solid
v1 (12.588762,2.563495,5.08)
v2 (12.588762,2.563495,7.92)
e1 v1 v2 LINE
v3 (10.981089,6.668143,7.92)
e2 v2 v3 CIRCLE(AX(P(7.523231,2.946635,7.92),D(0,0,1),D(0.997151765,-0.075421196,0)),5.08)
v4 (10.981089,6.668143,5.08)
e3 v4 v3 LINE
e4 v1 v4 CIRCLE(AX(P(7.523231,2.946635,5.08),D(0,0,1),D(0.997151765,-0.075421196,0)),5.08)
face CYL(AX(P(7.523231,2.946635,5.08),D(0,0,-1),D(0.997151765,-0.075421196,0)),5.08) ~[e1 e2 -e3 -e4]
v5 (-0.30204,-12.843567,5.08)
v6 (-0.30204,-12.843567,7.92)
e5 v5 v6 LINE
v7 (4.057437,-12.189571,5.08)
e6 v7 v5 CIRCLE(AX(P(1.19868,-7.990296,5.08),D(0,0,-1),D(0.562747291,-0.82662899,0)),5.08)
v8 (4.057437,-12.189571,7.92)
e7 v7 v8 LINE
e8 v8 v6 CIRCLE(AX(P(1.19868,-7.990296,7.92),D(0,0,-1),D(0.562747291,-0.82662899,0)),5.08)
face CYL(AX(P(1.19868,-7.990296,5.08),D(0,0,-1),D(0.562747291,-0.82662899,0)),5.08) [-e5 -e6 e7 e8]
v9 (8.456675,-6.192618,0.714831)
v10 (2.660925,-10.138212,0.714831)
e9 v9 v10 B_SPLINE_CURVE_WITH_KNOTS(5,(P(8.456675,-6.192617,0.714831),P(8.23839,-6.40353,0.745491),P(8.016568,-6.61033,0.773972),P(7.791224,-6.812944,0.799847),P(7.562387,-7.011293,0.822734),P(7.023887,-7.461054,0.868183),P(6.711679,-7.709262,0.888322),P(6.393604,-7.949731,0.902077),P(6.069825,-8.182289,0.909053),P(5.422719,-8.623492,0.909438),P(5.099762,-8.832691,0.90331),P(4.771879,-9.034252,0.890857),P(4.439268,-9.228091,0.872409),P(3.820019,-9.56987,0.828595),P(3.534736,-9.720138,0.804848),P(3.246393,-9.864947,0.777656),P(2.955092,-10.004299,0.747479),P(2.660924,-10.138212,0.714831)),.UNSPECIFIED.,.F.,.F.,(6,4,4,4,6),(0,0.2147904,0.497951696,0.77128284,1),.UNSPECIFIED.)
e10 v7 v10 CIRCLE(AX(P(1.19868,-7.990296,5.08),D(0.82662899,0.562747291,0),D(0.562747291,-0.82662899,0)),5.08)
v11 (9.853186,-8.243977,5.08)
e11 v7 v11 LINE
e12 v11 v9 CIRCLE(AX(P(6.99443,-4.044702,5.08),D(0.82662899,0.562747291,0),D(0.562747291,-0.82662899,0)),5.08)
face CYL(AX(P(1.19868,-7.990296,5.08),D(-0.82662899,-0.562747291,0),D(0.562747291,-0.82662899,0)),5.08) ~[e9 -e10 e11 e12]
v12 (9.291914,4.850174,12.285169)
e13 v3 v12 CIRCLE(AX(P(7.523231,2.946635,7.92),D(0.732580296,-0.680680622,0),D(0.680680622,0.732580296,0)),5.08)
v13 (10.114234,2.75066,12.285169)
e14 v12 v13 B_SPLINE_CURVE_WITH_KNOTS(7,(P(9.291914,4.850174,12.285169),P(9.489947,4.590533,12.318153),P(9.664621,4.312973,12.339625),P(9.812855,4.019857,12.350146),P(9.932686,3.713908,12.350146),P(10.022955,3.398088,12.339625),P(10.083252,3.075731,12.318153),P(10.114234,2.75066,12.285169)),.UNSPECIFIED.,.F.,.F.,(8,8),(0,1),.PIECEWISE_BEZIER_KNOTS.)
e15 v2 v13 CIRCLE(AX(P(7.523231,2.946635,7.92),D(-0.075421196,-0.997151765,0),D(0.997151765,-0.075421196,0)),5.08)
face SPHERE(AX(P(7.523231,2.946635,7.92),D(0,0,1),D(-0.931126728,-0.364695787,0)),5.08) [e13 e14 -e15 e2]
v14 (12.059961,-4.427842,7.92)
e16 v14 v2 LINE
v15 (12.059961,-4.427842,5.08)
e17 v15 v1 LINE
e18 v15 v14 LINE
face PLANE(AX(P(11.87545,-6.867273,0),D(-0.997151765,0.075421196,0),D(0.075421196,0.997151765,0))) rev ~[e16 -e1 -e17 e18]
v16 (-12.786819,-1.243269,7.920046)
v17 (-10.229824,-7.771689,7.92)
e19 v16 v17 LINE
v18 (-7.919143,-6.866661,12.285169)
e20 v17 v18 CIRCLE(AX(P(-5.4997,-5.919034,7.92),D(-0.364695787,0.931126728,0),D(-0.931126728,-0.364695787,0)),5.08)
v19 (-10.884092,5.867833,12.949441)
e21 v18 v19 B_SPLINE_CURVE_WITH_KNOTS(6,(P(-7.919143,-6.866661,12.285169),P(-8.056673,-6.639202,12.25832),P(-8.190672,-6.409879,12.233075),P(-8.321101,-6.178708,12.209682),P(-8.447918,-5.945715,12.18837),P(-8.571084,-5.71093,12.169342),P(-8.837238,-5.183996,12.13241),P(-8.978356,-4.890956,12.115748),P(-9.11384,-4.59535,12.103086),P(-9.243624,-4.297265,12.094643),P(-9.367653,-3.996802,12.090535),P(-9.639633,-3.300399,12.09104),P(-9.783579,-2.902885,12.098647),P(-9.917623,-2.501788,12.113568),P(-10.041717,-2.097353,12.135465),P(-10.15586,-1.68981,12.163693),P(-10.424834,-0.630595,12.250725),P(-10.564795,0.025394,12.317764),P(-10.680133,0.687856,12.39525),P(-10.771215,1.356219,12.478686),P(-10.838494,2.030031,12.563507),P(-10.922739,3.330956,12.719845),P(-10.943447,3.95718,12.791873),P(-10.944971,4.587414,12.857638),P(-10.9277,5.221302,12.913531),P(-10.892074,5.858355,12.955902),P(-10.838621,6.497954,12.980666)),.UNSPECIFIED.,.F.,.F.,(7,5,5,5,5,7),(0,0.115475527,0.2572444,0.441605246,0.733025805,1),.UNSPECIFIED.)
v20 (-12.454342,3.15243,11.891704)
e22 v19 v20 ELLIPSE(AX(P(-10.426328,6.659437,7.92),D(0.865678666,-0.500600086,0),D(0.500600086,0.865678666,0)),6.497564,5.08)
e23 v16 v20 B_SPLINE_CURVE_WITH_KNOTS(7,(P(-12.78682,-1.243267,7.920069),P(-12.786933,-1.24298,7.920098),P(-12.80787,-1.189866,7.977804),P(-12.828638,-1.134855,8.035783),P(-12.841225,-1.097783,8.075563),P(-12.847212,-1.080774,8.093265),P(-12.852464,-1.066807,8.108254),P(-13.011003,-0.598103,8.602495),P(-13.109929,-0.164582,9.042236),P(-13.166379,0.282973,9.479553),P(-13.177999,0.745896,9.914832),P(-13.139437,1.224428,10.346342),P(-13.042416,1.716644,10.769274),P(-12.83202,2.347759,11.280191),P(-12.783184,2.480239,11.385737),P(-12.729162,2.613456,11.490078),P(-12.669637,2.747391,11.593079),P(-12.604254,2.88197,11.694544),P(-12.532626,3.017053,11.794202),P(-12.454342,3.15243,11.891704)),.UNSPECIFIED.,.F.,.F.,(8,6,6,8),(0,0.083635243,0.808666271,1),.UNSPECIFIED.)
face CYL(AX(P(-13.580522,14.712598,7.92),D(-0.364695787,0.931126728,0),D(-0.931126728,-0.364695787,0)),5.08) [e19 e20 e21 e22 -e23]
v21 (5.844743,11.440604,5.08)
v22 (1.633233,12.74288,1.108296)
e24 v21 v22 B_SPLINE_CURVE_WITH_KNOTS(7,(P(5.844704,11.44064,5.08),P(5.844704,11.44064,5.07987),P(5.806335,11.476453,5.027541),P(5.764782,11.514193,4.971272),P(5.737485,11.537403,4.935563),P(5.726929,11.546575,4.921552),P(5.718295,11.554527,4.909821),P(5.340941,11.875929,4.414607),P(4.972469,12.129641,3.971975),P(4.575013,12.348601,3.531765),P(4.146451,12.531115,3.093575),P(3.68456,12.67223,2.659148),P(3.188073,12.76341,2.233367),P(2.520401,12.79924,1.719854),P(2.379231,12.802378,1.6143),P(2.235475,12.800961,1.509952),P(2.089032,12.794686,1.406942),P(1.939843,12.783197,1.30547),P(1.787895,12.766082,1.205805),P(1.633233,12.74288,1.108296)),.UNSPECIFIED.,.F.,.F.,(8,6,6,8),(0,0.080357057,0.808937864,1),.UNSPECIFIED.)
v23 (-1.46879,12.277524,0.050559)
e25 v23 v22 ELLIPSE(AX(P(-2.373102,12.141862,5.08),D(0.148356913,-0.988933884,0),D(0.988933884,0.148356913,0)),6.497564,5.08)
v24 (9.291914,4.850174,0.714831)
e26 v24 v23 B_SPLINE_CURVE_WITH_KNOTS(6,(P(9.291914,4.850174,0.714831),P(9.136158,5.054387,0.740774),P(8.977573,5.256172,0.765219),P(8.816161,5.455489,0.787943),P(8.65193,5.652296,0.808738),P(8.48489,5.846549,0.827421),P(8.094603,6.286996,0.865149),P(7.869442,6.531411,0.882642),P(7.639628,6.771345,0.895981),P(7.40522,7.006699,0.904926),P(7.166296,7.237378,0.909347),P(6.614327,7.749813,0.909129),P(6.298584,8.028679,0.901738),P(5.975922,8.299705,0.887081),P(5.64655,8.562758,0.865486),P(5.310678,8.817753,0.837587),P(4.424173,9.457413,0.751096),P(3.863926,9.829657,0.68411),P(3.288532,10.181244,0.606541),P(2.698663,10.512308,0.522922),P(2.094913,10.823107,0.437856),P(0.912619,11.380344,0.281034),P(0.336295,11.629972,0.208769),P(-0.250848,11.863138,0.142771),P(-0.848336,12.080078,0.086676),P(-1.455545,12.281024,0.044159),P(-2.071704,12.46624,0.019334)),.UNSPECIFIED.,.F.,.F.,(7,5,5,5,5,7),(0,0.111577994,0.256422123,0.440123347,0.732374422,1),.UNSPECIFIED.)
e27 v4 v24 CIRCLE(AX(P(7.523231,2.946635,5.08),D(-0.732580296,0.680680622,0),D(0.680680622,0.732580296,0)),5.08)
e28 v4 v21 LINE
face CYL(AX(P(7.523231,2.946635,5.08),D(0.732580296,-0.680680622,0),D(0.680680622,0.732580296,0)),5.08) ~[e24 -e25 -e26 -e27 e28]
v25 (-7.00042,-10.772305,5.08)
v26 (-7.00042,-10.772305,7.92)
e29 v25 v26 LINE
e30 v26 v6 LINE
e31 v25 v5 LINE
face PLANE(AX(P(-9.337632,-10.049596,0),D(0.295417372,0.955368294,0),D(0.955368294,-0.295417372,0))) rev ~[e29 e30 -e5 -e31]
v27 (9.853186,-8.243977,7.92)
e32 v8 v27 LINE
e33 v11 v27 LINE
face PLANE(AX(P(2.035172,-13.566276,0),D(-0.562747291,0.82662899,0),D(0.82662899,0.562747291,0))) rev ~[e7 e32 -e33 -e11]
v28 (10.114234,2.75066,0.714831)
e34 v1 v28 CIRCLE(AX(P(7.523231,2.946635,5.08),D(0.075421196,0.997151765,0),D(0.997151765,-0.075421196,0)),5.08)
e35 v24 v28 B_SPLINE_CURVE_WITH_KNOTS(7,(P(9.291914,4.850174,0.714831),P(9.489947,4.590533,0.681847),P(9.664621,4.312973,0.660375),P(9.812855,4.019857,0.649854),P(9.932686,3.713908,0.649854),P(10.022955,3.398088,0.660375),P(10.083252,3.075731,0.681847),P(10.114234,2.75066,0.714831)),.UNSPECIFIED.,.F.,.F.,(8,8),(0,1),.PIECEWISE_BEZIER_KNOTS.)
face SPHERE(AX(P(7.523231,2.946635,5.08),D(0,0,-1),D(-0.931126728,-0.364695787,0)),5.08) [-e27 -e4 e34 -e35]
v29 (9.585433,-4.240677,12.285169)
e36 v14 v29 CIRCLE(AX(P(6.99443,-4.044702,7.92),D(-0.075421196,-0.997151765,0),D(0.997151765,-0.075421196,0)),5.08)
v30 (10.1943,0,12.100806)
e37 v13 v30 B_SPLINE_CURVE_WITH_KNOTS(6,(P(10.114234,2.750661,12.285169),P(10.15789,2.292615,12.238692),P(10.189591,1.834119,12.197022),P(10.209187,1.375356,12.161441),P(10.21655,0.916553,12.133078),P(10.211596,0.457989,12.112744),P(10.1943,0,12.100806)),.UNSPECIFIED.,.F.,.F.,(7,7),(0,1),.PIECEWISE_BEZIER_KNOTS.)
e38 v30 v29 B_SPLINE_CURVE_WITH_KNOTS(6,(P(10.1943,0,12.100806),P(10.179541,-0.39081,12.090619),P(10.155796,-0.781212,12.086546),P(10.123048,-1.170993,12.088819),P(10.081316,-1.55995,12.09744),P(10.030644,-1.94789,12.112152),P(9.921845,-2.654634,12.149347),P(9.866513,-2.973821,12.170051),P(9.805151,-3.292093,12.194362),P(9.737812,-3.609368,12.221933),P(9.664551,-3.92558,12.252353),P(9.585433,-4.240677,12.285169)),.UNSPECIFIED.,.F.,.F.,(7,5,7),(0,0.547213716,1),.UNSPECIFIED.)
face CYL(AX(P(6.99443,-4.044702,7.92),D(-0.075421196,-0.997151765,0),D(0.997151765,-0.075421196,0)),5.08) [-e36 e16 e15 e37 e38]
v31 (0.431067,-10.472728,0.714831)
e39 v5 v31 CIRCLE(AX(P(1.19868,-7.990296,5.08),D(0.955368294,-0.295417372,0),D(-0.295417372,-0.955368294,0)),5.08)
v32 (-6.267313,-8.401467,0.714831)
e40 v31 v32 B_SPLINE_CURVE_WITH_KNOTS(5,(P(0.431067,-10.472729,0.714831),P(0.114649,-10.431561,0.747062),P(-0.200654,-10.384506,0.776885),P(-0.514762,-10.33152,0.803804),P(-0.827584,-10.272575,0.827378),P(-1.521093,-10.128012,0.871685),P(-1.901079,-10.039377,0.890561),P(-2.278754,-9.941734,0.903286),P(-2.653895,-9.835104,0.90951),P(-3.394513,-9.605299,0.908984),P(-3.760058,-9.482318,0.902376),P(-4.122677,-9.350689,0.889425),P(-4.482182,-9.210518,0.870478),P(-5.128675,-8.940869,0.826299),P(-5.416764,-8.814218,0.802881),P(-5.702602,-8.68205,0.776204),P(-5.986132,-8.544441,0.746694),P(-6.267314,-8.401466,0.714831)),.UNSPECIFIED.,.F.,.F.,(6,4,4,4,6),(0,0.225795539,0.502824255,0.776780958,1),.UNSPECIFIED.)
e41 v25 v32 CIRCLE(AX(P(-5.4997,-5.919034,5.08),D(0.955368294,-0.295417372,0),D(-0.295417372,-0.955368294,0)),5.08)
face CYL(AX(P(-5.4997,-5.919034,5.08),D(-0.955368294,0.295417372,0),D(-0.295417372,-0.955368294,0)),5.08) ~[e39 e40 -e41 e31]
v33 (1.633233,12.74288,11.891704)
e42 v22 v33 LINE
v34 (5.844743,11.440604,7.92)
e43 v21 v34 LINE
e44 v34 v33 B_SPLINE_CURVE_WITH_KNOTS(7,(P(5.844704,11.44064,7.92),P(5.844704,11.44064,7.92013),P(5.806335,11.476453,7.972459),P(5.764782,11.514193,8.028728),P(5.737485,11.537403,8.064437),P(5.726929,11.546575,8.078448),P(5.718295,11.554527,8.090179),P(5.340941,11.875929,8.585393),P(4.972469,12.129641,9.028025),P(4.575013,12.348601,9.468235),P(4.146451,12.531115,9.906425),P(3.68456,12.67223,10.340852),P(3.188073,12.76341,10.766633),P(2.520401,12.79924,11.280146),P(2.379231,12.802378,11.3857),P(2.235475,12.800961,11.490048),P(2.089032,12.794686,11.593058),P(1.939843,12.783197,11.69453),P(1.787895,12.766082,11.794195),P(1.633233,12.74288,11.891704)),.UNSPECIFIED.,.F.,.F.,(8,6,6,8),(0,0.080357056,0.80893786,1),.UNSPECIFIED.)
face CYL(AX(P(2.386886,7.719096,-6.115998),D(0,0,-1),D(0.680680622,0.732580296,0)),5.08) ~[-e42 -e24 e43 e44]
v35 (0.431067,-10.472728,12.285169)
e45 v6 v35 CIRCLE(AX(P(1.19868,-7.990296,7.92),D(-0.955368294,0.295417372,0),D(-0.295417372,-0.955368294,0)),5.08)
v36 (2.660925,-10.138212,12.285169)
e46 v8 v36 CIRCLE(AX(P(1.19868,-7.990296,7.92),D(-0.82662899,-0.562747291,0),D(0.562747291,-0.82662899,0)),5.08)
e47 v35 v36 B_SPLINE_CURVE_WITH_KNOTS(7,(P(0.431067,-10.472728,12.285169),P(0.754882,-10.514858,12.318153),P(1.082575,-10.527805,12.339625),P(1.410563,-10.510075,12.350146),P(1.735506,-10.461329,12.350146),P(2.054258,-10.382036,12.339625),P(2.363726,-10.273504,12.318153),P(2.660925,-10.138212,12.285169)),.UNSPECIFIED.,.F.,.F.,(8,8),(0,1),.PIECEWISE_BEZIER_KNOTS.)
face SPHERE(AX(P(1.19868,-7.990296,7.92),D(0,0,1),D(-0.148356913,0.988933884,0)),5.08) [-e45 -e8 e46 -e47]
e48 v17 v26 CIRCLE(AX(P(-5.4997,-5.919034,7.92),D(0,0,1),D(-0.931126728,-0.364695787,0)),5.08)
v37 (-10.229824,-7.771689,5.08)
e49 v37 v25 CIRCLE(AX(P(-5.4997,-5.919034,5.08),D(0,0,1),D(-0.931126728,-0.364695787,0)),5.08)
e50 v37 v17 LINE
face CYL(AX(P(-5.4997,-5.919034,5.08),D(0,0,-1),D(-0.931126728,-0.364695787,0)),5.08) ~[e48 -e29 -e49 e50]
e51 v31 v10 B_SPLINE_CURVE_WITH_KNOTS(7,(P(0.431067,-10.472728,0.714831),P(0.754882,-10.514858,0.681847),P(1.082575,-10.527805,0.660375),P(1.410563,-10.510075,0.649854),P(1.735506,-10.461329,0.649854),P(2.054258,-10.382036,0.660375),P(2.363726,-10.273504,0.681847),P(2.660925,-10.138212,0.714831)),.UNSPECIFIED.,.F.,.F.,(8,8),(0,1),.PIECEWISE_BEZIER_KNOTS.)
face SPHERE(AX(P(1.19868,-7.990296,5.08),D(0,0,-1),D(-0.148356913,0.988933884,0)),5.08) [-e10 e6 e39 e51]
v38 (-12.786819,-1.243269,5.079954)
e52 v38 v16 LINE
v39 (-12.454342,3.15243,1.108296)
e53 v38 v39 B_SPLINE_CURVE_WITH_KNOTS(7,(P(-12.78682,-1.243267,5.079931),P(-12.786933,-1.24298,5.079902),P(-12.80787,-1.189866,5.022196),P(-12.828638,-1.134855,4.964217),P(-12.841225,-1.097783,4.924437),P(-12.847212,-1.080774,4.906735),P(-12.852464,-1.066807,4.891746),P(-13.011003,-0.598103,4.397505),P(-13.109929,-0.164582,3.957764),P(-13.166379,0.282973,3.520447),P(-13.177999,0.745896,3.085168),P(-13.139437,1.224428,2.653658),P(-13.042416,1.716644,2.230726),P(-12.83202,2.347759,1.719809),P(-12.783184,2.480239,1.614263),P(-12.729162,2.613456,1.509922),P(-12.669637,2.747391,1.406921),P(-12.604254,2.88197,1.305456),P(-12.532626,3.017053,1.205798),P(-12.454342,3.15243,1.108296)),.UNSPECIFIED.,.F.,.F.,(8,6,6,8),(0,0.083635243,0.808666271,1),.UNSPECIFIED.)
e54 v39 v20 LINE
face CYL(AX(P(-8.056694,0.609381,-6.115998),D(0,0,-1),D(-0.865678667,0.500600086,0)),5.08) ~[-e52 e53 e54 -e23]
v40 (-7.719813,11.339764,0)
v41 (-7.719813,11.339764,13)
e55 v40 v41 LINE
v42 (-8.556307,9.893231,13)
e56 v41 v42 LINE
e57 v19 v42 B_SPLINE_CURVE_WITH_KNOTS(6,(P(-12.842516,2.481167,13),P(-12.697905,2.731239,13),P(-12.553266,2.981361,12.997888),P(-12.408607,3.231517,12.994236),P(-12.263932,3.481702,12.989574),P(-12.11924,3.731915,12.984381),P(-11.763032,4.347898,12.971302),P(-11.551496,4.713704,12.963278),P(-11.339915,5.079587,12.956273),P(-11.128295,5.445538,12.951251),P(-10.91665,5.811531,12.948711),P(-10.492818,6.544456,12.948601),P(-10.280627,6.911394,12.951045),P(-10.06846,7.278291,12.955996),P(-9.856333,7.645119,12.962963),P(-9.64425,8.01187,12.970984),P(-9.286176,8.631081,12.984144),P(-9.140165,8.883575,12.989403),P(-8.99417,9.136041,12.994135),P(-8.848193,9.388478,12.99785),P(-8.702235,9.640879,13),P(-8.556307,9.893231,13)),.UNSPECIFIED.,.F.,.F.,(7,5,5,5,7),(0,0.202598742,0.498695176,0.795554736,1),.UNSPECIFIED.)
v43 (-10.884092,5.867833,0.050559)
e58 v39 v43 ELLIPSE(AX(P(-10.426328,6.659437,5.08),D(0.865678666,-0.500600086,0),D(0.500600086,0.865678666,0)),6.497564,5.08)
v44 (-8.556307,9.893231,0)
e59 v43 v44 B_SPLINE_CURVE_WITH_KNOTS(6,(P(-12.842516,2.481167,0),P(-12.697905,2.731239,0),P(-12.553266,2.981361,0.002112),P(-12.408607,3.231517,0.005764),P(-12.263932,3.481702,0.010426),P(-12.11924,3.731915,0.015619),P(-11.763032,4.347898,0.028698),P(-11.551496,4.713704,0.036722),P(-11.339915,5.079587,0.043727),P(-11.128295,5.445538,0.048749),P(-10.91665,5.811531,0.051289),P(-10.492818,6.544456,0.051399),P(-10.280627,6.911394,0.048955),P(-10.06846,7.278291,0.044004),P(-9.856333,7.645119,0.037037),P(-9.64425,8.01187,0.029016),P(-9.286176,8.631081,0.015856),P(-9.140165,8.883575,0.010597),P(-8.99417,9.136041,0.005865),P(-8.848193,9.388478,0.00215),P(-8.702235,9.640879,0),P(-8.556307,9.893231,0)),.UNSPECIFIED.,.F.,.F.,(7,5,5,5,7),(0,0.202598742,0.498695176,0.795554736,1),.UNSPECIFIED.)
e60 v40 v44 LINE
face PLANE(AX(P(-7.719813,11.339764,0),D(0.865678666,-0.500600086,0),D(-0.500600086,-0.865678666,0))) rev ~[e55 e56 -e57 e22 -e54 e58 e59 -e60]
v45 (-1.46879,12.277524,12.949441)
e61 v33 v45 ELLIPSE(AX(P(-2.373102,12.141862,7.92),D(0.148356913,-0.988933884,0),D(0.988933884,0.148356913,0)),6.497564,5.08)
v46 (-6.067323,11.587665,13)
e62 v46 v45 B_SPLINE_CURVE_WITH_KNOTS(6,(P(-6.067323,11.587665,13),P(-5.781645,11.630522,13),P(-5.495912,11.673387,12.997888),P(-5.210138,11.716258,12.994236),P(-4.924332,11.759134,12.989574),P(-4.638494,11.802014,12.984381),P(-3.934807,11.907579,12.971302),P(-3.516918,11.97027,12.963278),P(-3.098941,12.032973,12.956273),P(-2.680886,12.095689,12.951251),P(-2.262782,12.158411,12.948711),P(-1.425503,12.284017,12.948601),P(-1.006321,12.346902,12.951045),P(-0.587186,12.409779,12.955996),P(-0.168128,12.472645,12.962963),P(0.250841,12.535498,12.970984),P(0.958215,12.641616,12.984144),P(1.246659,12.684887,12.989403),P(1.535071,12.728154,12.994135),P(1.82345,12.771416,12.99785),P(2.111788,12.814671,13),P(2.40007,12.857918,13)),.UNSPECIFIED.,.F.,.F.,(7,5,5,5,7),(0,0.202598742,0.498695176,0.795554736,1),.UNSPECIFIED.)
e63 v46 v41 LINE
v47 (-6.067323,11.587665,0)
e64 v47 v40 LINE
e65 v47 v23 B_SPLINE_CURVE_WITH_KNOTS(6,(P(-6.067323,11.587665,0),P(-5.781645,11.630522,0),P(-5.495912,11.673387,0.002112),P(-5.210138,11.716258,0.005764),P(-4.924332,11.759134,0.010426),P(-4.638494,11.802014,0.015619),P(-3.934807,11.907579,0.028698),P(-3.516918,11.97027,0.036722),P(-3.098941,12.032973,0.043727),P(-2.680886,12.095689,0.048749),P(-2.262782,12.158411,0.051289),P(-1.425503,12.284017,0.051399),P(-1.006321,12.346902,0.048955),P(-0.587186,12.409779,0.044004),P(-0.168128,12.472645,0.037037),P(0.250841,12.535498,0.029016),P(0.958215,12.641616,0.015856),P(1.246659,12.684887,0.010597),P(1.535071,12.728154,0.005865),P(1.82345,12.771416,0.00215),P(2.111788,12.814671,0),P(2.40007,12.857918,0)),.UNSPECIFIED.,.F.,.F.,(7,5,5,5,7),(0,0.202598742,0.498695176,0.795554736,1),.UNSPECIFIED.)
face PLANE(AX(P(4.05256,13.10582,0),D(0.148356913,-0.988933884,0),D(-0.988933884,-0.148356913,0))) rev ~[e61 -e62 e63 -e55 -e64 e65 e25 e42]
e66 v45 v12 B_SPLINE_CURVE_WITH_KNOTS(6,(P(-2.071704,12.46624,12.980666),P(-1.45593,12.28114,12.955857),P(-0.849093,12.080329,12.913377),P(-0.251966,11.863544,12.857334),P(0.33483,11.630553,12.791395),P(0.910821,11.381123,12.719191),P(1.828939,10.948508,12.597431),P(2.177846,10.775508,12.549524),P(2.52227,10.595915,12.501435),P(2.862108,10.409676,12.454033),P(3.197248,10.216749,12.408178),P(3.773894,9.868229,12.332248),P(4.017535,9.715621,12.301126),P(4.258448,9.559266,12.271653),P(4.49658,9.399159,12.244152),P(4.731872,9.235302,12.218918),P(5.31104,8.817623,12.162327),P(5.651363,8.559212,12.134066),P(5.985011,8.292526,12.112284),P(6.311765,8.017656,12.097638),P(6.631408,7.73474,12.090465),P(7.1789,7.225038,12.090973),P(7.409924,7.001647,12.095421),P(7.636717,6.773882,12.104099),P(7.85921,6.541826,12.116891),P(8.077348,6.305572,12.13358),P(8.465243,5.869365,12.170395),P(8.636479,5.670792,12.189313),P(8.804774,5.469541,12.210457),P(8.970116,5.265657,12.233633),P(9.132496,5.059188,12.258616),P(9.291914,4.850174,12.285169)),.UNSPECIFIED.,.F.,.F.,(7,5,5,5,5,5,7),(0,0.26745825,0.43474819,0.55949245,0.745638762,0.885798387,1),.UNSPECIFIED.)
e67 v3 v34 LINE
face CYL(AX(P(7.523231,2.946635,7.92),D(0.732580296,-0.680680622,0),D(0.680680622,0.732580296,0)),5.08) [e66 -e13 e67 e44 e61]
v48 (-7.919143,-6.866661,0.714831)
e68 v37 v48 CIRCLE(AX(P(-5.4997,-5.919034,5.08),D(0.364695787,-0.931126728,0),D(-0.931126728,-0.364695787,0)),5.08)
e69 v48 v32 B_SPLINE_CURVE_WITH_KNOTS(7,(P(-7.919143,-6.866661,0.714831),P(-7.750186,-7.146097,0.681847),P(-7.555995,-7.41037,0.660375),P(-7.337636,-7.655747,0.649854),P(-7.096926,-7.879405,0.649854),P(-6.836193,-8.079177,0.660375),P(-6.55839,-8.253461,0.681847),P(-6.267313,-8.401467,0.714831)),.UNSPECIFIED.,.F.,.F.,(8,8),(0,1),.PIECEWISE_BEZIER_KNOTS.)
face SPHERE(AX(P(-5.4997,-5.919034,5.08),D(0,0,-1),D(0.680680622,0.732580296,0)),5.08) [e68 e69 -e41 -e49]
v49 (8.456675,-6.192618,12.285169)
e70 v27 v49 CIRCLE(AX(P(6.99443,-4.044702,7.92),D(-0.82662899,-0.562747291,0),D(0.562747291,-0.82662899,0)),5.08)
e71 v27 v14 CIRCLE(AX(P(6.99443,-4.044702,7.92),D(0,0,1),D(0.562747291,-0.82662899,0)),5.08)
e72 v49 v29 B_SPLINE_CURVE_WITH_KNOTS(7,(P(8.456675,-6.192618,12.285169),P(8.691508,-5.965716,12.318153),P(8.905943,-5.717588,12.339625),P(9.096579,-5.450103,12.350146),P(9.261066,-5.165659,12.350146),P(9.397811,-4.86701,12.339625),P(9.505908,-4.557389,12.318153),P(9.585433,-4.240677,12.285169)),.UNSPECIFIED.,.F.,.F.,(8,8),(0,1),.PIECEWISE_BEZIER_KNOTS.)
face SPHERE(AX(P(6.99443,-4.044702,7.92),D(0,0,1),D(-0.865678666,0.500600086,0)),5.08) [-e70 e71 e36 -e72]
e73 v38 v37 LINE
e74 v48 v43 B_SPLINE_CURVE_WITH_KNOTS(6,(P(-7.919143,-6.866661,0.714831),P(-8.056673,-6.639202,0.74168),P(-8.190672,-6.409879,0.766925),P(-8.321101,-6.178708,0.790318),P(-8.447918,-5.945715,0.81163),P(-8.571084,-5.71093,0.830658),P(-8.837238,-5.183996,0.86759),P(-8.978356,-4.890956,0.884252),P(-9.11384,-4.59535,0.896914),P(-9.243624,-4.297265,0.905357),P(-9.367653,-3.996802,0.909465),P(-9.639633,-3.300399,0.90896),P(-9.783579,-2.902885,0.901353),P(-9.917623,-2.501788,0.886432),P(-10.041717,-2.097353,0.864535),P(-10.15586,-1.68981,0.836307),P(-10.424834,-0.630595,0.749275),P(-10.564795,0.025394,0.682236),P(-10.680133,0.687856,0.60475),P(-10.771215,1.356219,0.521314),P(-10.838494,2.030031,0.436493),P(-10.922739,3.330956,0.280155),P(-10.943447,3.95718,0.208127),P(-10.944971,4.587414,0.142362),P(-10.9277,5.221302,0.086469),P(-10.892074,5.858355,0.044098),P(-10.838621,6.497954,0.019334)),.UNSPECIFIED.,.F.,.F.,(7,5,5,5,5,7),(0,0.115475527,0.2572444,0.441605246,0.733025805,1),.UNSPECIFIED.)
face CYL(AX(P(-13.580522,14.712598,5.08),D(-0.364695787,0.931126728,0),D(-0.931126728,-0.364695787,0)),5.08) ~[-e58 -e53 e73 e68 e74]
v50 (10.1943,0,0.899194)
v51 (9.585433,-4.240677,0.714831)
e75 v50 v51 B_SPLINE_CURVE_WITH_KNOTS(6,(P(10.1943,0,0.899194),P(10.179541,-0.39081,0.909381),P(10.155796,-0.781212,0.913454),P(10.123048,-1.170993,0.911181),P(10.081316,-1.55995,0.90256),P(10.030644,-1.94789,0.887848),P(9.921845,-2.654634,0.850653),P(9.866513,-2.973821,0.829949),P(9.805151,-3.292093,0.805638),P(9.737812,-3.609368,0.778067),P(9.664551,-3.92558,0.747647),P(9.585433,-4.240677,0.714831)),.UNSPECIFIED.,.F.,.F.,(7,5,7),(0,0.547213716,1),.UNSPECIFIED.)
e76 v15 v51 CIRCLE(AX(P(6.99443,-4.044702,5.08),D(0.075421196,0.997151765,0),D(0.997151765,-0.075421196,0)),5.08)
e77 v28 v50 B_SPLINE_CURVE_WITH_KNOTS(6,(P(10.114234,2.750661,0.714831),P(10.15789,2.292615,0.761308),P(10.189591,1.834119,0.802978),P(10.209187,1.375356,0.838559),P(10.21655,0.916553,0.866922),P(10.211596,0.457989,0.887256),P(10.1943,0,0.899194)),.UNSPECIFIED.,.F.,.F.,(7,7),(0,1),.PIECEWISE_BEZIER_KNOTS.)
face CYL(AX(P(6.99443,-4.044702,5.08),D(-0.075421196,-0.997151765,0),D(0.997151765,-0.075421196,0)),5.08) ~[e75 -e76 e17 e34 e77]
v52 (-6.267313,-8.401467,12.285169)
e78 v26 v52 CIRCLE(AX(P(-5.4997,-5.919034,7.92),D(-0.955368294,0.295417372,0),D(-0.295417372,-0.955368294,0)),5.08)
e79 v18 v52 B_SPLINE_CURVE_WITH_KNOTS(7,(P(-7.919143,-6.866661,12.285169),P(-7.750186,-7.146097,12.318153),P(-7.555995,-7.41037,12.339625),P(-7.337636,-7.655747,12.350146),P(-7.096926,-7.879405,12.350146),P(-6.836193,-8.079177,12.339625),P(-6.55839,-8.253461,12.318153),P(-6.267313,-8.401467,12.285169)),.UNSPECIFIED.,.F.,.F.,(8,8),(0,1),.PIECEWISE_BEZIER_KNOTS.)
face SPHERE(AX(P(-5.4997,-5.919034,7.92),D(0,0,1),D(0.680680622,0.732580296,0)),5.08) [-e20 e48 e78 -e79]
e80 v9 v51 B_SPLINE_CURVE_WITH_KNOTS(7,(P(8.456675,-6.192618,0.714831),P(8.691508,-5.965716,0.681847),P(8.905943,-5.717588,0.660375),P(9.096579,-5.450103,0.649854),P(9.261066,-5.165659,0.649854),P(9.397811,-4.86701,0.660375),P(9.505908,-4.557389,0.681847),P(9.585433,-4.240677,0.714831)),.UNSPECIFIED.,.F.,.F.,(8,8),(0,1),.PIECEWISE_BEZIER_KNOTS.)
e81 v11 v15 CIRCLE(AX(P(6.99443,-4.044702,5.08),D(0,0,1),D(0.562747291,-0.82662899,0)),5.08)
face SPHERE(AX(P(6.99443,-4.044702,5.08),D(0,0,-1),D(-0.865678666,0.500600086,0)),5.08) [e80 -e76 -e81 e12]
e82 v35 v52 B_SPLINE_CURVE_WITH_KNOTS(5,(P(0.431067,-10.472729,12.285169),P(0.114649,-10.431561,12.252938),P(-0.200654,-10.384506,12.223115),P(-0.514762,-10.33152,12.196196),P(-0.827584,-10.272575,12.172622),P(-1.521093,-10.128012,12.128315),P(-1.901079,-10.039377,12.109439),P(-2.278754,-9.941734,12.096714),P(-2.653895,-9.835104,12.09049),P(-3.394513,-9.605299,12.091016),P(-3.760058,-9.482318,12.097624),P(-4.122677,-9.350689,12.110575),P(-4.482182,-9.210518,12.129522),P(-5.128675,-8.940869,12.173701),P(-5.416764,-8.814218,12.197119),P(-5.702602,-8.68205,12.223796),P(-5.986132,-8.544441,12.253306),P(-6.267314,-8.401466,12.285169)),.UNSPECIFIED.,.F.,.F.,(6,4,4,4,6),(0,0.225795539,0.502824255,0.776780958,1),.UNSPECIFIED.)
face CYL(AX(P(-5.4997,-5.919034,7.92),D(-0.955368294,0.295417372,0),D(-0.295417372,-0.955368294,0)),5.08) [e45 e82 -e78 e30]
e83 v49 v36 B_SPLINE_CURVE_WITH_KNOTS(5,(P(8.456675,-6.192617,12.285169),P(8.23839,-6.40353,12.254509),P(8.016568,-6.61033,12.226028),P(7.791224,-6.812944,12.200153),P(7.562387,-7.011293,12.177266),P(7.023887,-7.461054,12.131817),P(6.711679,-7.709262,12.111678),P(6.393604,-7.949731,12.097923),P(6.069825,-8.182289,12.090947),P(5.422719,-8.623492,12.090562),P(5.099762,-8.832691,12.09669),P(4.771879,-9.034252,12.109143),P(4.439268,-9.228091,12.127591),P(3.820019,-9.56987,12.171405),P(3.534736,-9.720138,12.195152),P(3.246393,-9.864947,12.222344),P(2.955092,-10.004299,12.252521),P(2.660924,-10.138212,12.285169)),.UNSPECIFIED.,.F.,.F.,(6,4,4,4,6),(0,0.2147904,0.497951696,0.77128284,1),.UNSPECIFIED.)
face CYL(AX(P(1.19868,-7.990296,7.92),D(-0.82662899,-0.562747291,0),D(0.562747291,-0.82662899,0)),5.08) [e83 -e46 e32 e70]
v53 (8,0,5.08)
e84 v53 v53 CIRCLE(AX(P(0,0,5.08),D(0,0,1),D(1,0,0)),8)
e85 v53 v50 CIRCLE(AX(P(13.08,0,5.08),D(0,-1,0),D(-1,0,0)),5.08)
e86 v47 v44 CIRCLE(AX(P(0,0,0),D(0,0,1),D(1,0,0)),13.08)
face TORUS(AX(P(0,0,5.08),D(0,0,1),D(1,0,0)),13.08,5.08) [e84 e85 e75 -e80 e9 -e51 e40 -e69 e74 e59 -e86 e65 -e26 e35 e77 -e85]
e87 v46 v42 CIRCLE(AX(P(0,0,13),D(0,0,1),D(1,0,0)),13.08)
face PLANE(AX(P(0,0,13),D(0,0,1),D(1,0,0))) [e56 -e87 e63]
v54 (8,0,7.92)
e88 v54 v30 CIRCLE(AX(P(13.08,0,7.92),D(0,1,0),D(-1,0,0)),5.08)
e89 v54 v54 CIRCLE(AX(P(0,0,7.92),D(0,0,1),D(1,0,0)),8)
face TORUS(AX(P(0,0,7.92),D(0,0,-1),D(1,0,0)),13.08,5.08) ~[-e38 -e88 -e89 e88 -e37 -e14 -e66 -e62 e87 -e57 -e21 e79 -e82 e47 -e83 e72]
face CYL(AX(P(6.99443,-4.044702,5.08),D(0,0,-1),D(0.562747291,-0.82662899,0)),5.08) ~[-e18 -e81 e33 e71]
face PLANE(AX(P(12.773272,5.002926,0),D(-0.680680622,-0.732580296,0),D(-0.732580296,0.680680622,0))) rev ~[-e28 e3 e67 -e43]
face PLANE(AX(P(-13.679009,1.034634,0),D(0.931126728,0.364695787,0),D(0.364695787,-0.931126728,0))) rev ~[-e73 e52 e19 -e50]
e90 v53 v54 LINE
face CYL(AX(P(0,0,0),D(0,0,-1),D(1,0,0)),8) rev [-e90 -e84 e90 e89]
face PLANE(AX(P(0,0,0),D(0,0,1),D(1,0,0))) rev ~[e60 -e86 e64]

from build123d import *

# Parameters (mm, degrees)
F0_R         = 8
F1_DEPTH     = 13
F2_T1_DEPTH  = 2.84
F2_T3_DEPTH  = 7.0113068008
F2_T5_DEPTH  = 7.0113068008
F2_T7_DEPTH  = 7.0113068008
F2_T9_DEPTH  = 25.2319953177
F2_T11_DEPTH = 22.1577058643
F2_T13_DEPTH = 22.1577058643
F2_T18_DEPTH = 5.08
F2_T24_DEPTH = 5.08
F2_T30_DEPTH = 5.08
F2_T36_DEPTH = 5.08
F2_T42_DEPTH = 5.08
F2_T48_DEPTH = 5.08
F2_T54_DEPTH = 5.08
F2_T60_DEPTH = 5.08


# Not quite as in the source:
# - a fillet or chamfer that OpenCascade refuses, or shapes differently, is made with other operations: its cross-section is extruded or revolved along the edge and cut away or added


with BuildPart() as f1:
    # F0 (on Top) → F1 (new body)
    with BuildSketch(Plane.XY):
        Polygon((-7.71981316, 11.3397637924), (-13.6790091142, 1.0346341127), (-9.3376322044, -10.0495961565), (2.0351722083, -13.5662755455), (11.8754504382, -6.8672727471), (12.7732722731, 5.0029264966), (4.0525595591, 13.1058200473), align=None)
        Circle(F0_R, mode=Mode.SUBTRACT)
    extrude(amount=F1_DEPTH)

    # F2: fillet of radius 5.08 on 19 edges, made by hand

    # F2_s2 → F2_t1 (cut)
    with BuildSketch(Plane.XY.offset(5.08)):
        with BuildLine():
            ThreePointArc((-10.2298236351, -7.7716886015), (-8.9575574192, -9.6405419105), (-7.0004201054, -10.7723049377))
            Line((-7.0004201054, -10.7723049377), (-9.3376322044, -10.0495961565))
            Line((-9.3376322044, -10.0495961565), (-10.2298236351, -7.7716886015))
        make_face()
        with BuildLine():
            ThreePointArc((4.0574365946, -12.1895711001), (1.9523334733, -13.0140799619), (-0.3020398907, -12.8435667642))
            Line((-0.3020398907, -12.8435667642), (2.0351722083, -13.5662755455))
            Line((2.0351722083, -13.5662755455), (4.0574365946, -12.1895711001))
        make_face()
        with BuildLine():
            ThreePointArc((9.8531860519, -8.2439771925), (11.39207744, -6.5877503632), (12.0599607822, -4.4278416022))
            Line((12.0599607822, -4.4278416022), (11.8754504382, -6.8672727471))
            Line((11.8754504382, -6.8672727471), (9.8531860519, -8.2439771925))
        make_face()
        with BuildLine():
            ThreePointArc((12.588761929, 2.5634953517), (12.2533547384, 4.7992896247), (10.9810885225, 6.6681429337))
            Line((10.9810885225, 6.6681429337), (12.7732722731, 5.0029264966))
            Line((12.7732722731, 5.0029264966), (12.588761929, 2.5634953517))
        make_face()
    extrude(amount=F2_T1_DEPTH, mode=Mode.SUBTRACT)

    # F2_s4 → F2_t3 (cut)
    with BuildSketch(Plane(origin=(-3.3491901073, 1.0356309133, 0), x_dir=(0, 0, 1), z_dir=(0.9553682937, -0.2954173716, 0))):
        with BuildLine():
            ThreePointArc((5.08, 12.3595642949), (1.4878975516, 10.8716667433), (0, 7.2795642949))
            Line((0, 7.2795642949), (0, 12.3595642949))
            Line((0, 12.3595642949), (5.08, 12.3595642949))
        make_face()
        with BuildLine():
            ThreePointArc((7.92, 12.3595642949), (11.5121024484, 10.8716667433), (13, 7.2795642949))
            Line((13, 7.2795642949), (13, 12.3595642949))
            Line((13, 12.3595642949), (7.92, 12.3595642949))
        make_face()
    extrude(amount=F2_T3_DEPTH, mode=Mode.SUBTRACT)

    # F2_s6 → F2_t5 (cut)
    with BuildSketch(Plane(origin=(-2.8978747286, -1.9727969538, 0), x_dir=(0, 0, 1), z_dir=(0.8266289897, 0.5627472909, 0))):
        with BuildLine():
            ThreePointArc((5.08, 12.3595642949), (1.4878975516, 10.8716667433), (0, 7.2795642949))
            Line((0, 7.2795642949), (0, 12.3595642949))
            Line((0, 12.3595642949), (5.08, 12.3595642949))
        make_face()
        with BuildLine():
            ThreePointArc((7.92, 12.3595642949), (11.5121024484, 10.8716667433), (13, 7.2795642949))
            Line((13, 7.2795642949), (13, 12.3595642949))
            Line((13, 12.3595642949), (7.92, 12.3595642949))
        make_face()
    extrude(amount=F2_T5_DEPTH, mode=Mode.SUBTRACT)

    # F2_s8 → F2_t7 (cut)
    with BuildSketch(Plane(origin=(-0.2644005734, -3.4956684769, 0), x_dir=(0, 0, 1), z_dir=(0.0754211963, 0.9971517654, 0))):
        with BuildLine():
            ThreePointArc((5.08, 12.3595642949), (1.4878975516, 10.8716667433), (0, 7.2795642949))
            Line((0, 7.2795642949), (0, 12.3595642949))
            Line((0, 12.3595642949), (5.08, 12.3595642949))
        make_face()
        with BuildLine():
            ThreePointArc((7.92, 12.3595642949), (11.5121024484, 10.8716667433), (13, 7.2795642949))
            Line((13, 7.2795642949), (13, 12.3595642949))
            Line((13, 12.3595642949), (7.92, 12.3595642949))
        make_face()
    extrude(amount=F2_T7_DEPTH, mode=Mode.SUBTRACT)

    # F2_s10 → F2_t9 (cut)
    with BuildSketch(Plane.XY.offset(-6.1159976589)):
        with BuildLine():
            ThreePointArc((-12.4543415319, 3.1524295918), (-13.1222248741, 0.9925208307), (-12.7868176835, -1.2432734423))
            Line((-12.7868176835, -1.2432734423), (-13.6790091142, 1.0346341127))
            Line((-13.6790091142, 1.0346341127), (-12.4543415319, 3.1524295918))
        make_face()
        with BuildLine():
            ThreePointArc((5.8447433097, 11.4406036103), (3.8876059959, 12.5723666375), (1.6332326319, 12.7428798351))
            Line((1.6332326319, 12.7428798351), (4.0525595591, 13.1058200473))
            Line((4.0525595591, 13.1058200473), (5.8447433097, 11.4406036103))
        make_face()
    extrude(amount=F2_T9_DEPTH, mode=Mode.SUBTRACT)

    # F2_s12 → F2_t11 (cut)
    with BuildSketch(Plane(origin=(-6.802324944, 17.367424578, 0), x_dir=(0, 0, 1), z_dir=(0.3646957865, -0.9311267278, 0))):
        with BuildLine():
            ThreePointArc((5.08, 12.3595642949), (1.4878975516, 10.8716667433), (0, 7.2795642949))
            Line((0, 7.2795642949), (0, 12.3595642949))
            Line((0, 12.3595642949), (5.08, 12.3595642949))
        make_face()
        with BuildLine():
            ThreePointArc((7.92, 12.3595642949), (11.5121024484, 10.8716667433), (13, 7.2795642949))
            Line((13, 7.2795642949), (13, 12.3595642949))
            Line((13, 12.3595642949), (7.92, 12.3595642949))
        make_face()
    extrude(amount=F2_T11_DEPTH, mode=Mode.SUBTRACT)

    # F2_s14 → F2_t13 (cut)
    with BuildSketch(Plane(origin=(2.5681726064, -2.3862303383, 0), x_dir=(0, 0, 1), z_dir=(-0.7325802962, 0.6806806223, 0))):
        with BuildLine():
            ThreePointArc((5.08, 12.3595642949), (1.4878975516, 10.8716667433), (0, 7.2795642949))
            Line((0, 7.2795642949), (0, 12.3595642949))
            Line((0, 12.3595642949), (5.08, 12.3595642949))
        make_face()
        with BuildLine():
            ThreePointArc((7.92, 12.3595642949), (11.5121024484, 10.8716667433), (13, 7.2795642949))
            Line((13, 7.2795642949), (13, 12.3595642949))
            Line((13, 12.3595642949), (7.92, 12.3595642949))
        make_face()
    extrude(amount=F2_T13_DEPTH, mode=Mode.SUBTRACT)


with BuildPart() as f2_tool16:
    # F2_s17 → F2_t18 (new body)
    with BuildSketch(Plane.XY.offset(5.08)):
        Polygon((-5.4996998577, -5.9190340058), (-10.2298236351, -7.7716886015), (-9.3376322044, -10.0495961565), (-7.0004201054, -10.7723049377), align=None)
    extrude(amount=-F2_T18_DEPTH)

    # F2_s19 → F2_t20 (revolve, cut)
    with BuildSketch(Plane(origin=(-5.4996998577, -5.9190340058, 5.08), x_dir=(0.6806806223, 0.7325802962, 0), z_dir=(-0.7325802962, 0.6806806223, 0))):
        with BuildLine():
            ThreePointArc((0, -5.08), (5.08, 0), (0, 5.08))
            Line((0, 5.08), (0, -5.08))
        make_face()
    revolve(axis=Axis((-5.4996998577, -5.9190340058, 5.08), (0, 0, -1)), mode=Mode.SUBTRACT)


with BuildPart() as f1_1:
    add(f1.part)

    # F2_t15: cut F2_tool16
    add(f2_tool16.part, mode=Mode.SUBTRACT)


with BuildPart() as f2_tool22:
    # F2_s23 → F2_t24 (new body)
    with BuildSketch(Plane.XY.offset(7.92)):
        Polygon((-5.4996998577, -5.9190340058), (-10.2298236351, -7.7716886015), (-9.3376322044, -10.0495961565), (-7.0004201054, -10.7723049377), align=None)
    extrude(amount=F2_T24_DEPTH)

    # F2_s25 → F2_t26 (revolve, cut)
    with BuildSketch(Plane(origin=(-5.4996998577, -5.9190340058, 7.92), x_dir=(0.6806806223, 0.7325802962, 0), z_dir=(0.7325802962, -0.6806806223, 0))):
        with BuildLine():
            ThreePointArc((0, -5.08), (5.08, 0), (0, 5.08))
            Line((0, 5.08), (0, -5.08))
        make_face()
    revolve(axis=Axis((-5.4996998577, -5.9190340058, 7.92), (0, 0, 1)), mode=Mode.SUBTRACT)


with BuildPart() as f1_2:
    add(f1_1.part)

    # F2_t21: cut F2_tool22
    add(f2_tool22.part, mode=Mode.SUBTRACT)


with BuildPart() as f2_tool28:
    # F2_s29 → F2_t30 (new body)
    with BuildSketch(Plane.XY.offset(5.08)):
        Polygon((1.198680357, -7.9902958324), (-0.3020398907, -12.8435667642), (2.0351722083, -13.5662755455), (4.0574365946, -12.1895711001), align=None)
    extrude(amount=-F2_T30_DEPTH)

    # F2_s31 → F2_t32 (revolve, cut)
    with BuildSketch(Plane(origin=(1.198680357, -7.9902958324, 5.08), x_dir=(-0.1483569126, 0.9889338838, 0), z_dir=(-0.9889338838, -0.1483569126, 0))):
        with BuildLine():
            ThreePointArc((0, -5.08), (5.08, 0), (0, 5.08))
            Line((0, 5.08), (0, -5.08))
        make_face()
    revolve(axis=Axis((1.198680357, -7.9902958324, 5.08), (0, 0, -1)), mode=Mode.SUBTRACT)


with BuildPart() as f1_3:
    add(f1_2.part)

    # F2_t27: cut F2_tool28
    add(f2_tool28.part, mode=Mode.SUBTRACT)


with BuildPart() as f2_tool34:
    # F2_s35 → F2_t36 (new body)
    with BuildSketch(Plane.XY.offset(7.92)):
        Polygon((1.198680357, -7.9902958324), (-0.3020398907, -12.8435667642), (2.0351722083, -13.5662755455), (4.0574365946, -12.1895711001), align=None)
    extrude(amount=F2_T36_DEPTH)

    # F2_s37 → F2_t38 (revolve, cut)
    with BuildSketch(Plane(origin=(1.198680357, -7.9902958324, 7.92), x_dir=(-0.1483569126, 0.9889338838, 0), z_dir=(0.9889338838, 0.1483569126, 0))):
        with BuildLine():
            ThreePointArc((0, -5.08), (5.08, 0), (0, 5.08))
            Line((0, 5.08), (0, -5.08))
        make_face()
    revolve(axis=Axis((1.198680357, -7.9902958324, 7.92), (0, 0, 1)), mode=Mode.SUBTRACT)


with BuildPart() as f1_4:
    add(f1_3.part)

    # F2_t33: cut F2_tool34
    add(f2_tool34.part, mode=Mode.SUBTRACT)


with BuildPart() as f2_tool40:
    # F2_s41 → F2_t42 (new body)
    with BuildSketch(Plane.XY.offset(5.08)):
        Polygon((6.9944298143, -4.0447019248), (9.8531860519, -8.2439771925), (11.8754504382, -6.8672727471), (12.0599607822, -4.4278416022), align=None)
    extrude(amount=-F2_T42_DEPTH)

    # F2_s43 → F2_t44 (revolve, cut)
    with BuildSketch(Plane(origin=(6.9944298143, -4.0447019248, 5.08), x_dir=(-0.8656786665, 0.5006000863, 0), z_dir=(-0.5006000863, -0.8656786665, 0))):
        with BuildLine():
            ThreePointArc((0, -5.08), (5.08, 0), (0, 5.08))
            Line((0, 5.08), (0, -5.08))
        make_face()
    revolve(axis=Axis((6.9944298143, -4.0447019248, 5.08), (0, 0, -1)), mode=Mode.SUBTRACT)


with BuildPart() as f1_5:
    add(f1_4.part)

    # F2_t39: cut F2_tool40
    add(f2_tool40.part, mode=Mode.SUBTRACT)


with BuildPart() as f2_tool46:
    # F2_s47 → F2_t48 (new body)
    with BuildSketch(Plane.XY.offset(7.92)):
        Polygon((6.9944298143, -4.0447019248), (9.8531860519, -8.2439771925), (11.8754504382, -6.8672727471), (12.0599607822, -4.4278416022), align=None)
    extrude(amount=F2_T48_DEPTH)

    # F2_s49 → F2_t50 (revolve, cut)
    with BuildSketch(Plane(origin=(6.9944298143, -4.0447019248, 7.92), x_dir=(-0.8656786665, 0.5006000863, 0), z_dir=(0.5006000863, 0.8656786665, 0))):
        with BuildLine():
            ThreePointArc((0, -5.08), (5.08, 0), (0, 5.08))
            Line((0, 5.08), (0, -5.08))
        make_face()
    revolve(axis=Axis((6.9944298143, -4.0447019248, 7.92), (0, 0, 1)), mode=Mode.SUBTRACT)


with BuildPart() as f1_6:
    add(f1_5.part)

    # F2_t45: cut F2_tool46
    add(f2_tool46.part, mode=Mode.SUBTRACT)


with BuildPart() as f2_tool52:
    # F2_s53 → F2_t54 (new body)
    with BuildSketch(Plane.XY.offset(5.08)):
        Polygon((7.523230961, 2.946635029), (12.588761929, 2.5634953517), (12.7732722731, 5.0029264966), (10.9810885225, 6.6681429337), align=None)
    extrude(amount=-F2_T54_DEPTH)

    # F2_s55 → F2_t56 (revolve, cut)
    with BuildSketch(Plane(origin=(7.523230961, 2.946635029, 5.08), x_dir=(-0.9311267278, -0.3646957865, 0), z_dir=(0.3646957865, -0.9311267278, 0))):
        with BuildLine():
            ThreePointArc((0, -5.08), (5.08, 0), (0, 5.08))
            Line((0, 5.08), (0, -5.08))
        make_face()
    revolve(axis=Axis((7.523230961, 2.946635029, 5.08), (0, 0, -1)), mode=Mode.SUBTRACT)


with BuildPart() as f1_7:
    add(f1_6.part)

    # F2_t51: cut F2_tool52
    add(f2_tool52.part, mode=Mode.SUBTRACT)


with BuildPart() as f2_tool58:
    # F2_s59 → F2_t60 (new body)
    with BuildSketch(Plane.XY.offset(7.92)):
        Polygon((7.523230961, 2.946635029), (12.588761929, 2.5634953517), (12.7732722731, 5.0029264966), (10.9810885225, 6.6681429337), align=None)
    extrude(amount=F2_T60_DEPTH)

    # F2_s61 → F2_t62 (revolve, cut)
    with BuildSketch(Plane(origin=(7.523230961, 2.946635029, 7.92), x_dir=(-0.9311267278, -0.3646957865, 0), z_dir=(-0.3646957865, 0.9311267278, 0))):
        with BuildLine():
            ThreePointArc((0, -5.08), (5.08, 0), (0, 5.08))
            Line((0, 5.08), (0, -5.08))
        make_face()
    revolve(axis=Axis((7.523230961, 2.946635029, 7.92), (0, 0, 1)), mode=Mode.SUBTRACT)


with BuildPart() as f1_8:
    add(f1_7.part)

    # F2_t57: cut F2_tool58
    add(f2_tool58.part, mode=Mode.SUBTRACT)

    # F2_s63 → F2_t64 (revolve, cut)
    with BuildSketch(Plane.XZ):
        with BuildLine():
            ThreePointArc((8, 5.08), (9.4878975516, 1.4878975516), (13.08, 0))
            Line((13.08, 0), (8, 0))
            Line((8, 0), (8, 5.08))
        make_face()
    revolve(axis=Axis((0, 0, 0), (0, 0, 1)), mode=Mode.SUBTRACT)

    # F2_s65 → F2_t66 (revolve, cut)
    with BuildSketch(Plane.XZ):
        with BuildLine():
            ThreePointArc((8, 7.92), (9.4878975516, 11.5121024484), (13.08, 13))
            Line((13.08, 13), (8, 13))
            Line((8, 13), (8, 7.92))
        make_face()
    revolve(axis=Axis((0, 0, 13), (0, 0, 1)), mode=Mode.SUBTRACT)


solid = f1_8.part
